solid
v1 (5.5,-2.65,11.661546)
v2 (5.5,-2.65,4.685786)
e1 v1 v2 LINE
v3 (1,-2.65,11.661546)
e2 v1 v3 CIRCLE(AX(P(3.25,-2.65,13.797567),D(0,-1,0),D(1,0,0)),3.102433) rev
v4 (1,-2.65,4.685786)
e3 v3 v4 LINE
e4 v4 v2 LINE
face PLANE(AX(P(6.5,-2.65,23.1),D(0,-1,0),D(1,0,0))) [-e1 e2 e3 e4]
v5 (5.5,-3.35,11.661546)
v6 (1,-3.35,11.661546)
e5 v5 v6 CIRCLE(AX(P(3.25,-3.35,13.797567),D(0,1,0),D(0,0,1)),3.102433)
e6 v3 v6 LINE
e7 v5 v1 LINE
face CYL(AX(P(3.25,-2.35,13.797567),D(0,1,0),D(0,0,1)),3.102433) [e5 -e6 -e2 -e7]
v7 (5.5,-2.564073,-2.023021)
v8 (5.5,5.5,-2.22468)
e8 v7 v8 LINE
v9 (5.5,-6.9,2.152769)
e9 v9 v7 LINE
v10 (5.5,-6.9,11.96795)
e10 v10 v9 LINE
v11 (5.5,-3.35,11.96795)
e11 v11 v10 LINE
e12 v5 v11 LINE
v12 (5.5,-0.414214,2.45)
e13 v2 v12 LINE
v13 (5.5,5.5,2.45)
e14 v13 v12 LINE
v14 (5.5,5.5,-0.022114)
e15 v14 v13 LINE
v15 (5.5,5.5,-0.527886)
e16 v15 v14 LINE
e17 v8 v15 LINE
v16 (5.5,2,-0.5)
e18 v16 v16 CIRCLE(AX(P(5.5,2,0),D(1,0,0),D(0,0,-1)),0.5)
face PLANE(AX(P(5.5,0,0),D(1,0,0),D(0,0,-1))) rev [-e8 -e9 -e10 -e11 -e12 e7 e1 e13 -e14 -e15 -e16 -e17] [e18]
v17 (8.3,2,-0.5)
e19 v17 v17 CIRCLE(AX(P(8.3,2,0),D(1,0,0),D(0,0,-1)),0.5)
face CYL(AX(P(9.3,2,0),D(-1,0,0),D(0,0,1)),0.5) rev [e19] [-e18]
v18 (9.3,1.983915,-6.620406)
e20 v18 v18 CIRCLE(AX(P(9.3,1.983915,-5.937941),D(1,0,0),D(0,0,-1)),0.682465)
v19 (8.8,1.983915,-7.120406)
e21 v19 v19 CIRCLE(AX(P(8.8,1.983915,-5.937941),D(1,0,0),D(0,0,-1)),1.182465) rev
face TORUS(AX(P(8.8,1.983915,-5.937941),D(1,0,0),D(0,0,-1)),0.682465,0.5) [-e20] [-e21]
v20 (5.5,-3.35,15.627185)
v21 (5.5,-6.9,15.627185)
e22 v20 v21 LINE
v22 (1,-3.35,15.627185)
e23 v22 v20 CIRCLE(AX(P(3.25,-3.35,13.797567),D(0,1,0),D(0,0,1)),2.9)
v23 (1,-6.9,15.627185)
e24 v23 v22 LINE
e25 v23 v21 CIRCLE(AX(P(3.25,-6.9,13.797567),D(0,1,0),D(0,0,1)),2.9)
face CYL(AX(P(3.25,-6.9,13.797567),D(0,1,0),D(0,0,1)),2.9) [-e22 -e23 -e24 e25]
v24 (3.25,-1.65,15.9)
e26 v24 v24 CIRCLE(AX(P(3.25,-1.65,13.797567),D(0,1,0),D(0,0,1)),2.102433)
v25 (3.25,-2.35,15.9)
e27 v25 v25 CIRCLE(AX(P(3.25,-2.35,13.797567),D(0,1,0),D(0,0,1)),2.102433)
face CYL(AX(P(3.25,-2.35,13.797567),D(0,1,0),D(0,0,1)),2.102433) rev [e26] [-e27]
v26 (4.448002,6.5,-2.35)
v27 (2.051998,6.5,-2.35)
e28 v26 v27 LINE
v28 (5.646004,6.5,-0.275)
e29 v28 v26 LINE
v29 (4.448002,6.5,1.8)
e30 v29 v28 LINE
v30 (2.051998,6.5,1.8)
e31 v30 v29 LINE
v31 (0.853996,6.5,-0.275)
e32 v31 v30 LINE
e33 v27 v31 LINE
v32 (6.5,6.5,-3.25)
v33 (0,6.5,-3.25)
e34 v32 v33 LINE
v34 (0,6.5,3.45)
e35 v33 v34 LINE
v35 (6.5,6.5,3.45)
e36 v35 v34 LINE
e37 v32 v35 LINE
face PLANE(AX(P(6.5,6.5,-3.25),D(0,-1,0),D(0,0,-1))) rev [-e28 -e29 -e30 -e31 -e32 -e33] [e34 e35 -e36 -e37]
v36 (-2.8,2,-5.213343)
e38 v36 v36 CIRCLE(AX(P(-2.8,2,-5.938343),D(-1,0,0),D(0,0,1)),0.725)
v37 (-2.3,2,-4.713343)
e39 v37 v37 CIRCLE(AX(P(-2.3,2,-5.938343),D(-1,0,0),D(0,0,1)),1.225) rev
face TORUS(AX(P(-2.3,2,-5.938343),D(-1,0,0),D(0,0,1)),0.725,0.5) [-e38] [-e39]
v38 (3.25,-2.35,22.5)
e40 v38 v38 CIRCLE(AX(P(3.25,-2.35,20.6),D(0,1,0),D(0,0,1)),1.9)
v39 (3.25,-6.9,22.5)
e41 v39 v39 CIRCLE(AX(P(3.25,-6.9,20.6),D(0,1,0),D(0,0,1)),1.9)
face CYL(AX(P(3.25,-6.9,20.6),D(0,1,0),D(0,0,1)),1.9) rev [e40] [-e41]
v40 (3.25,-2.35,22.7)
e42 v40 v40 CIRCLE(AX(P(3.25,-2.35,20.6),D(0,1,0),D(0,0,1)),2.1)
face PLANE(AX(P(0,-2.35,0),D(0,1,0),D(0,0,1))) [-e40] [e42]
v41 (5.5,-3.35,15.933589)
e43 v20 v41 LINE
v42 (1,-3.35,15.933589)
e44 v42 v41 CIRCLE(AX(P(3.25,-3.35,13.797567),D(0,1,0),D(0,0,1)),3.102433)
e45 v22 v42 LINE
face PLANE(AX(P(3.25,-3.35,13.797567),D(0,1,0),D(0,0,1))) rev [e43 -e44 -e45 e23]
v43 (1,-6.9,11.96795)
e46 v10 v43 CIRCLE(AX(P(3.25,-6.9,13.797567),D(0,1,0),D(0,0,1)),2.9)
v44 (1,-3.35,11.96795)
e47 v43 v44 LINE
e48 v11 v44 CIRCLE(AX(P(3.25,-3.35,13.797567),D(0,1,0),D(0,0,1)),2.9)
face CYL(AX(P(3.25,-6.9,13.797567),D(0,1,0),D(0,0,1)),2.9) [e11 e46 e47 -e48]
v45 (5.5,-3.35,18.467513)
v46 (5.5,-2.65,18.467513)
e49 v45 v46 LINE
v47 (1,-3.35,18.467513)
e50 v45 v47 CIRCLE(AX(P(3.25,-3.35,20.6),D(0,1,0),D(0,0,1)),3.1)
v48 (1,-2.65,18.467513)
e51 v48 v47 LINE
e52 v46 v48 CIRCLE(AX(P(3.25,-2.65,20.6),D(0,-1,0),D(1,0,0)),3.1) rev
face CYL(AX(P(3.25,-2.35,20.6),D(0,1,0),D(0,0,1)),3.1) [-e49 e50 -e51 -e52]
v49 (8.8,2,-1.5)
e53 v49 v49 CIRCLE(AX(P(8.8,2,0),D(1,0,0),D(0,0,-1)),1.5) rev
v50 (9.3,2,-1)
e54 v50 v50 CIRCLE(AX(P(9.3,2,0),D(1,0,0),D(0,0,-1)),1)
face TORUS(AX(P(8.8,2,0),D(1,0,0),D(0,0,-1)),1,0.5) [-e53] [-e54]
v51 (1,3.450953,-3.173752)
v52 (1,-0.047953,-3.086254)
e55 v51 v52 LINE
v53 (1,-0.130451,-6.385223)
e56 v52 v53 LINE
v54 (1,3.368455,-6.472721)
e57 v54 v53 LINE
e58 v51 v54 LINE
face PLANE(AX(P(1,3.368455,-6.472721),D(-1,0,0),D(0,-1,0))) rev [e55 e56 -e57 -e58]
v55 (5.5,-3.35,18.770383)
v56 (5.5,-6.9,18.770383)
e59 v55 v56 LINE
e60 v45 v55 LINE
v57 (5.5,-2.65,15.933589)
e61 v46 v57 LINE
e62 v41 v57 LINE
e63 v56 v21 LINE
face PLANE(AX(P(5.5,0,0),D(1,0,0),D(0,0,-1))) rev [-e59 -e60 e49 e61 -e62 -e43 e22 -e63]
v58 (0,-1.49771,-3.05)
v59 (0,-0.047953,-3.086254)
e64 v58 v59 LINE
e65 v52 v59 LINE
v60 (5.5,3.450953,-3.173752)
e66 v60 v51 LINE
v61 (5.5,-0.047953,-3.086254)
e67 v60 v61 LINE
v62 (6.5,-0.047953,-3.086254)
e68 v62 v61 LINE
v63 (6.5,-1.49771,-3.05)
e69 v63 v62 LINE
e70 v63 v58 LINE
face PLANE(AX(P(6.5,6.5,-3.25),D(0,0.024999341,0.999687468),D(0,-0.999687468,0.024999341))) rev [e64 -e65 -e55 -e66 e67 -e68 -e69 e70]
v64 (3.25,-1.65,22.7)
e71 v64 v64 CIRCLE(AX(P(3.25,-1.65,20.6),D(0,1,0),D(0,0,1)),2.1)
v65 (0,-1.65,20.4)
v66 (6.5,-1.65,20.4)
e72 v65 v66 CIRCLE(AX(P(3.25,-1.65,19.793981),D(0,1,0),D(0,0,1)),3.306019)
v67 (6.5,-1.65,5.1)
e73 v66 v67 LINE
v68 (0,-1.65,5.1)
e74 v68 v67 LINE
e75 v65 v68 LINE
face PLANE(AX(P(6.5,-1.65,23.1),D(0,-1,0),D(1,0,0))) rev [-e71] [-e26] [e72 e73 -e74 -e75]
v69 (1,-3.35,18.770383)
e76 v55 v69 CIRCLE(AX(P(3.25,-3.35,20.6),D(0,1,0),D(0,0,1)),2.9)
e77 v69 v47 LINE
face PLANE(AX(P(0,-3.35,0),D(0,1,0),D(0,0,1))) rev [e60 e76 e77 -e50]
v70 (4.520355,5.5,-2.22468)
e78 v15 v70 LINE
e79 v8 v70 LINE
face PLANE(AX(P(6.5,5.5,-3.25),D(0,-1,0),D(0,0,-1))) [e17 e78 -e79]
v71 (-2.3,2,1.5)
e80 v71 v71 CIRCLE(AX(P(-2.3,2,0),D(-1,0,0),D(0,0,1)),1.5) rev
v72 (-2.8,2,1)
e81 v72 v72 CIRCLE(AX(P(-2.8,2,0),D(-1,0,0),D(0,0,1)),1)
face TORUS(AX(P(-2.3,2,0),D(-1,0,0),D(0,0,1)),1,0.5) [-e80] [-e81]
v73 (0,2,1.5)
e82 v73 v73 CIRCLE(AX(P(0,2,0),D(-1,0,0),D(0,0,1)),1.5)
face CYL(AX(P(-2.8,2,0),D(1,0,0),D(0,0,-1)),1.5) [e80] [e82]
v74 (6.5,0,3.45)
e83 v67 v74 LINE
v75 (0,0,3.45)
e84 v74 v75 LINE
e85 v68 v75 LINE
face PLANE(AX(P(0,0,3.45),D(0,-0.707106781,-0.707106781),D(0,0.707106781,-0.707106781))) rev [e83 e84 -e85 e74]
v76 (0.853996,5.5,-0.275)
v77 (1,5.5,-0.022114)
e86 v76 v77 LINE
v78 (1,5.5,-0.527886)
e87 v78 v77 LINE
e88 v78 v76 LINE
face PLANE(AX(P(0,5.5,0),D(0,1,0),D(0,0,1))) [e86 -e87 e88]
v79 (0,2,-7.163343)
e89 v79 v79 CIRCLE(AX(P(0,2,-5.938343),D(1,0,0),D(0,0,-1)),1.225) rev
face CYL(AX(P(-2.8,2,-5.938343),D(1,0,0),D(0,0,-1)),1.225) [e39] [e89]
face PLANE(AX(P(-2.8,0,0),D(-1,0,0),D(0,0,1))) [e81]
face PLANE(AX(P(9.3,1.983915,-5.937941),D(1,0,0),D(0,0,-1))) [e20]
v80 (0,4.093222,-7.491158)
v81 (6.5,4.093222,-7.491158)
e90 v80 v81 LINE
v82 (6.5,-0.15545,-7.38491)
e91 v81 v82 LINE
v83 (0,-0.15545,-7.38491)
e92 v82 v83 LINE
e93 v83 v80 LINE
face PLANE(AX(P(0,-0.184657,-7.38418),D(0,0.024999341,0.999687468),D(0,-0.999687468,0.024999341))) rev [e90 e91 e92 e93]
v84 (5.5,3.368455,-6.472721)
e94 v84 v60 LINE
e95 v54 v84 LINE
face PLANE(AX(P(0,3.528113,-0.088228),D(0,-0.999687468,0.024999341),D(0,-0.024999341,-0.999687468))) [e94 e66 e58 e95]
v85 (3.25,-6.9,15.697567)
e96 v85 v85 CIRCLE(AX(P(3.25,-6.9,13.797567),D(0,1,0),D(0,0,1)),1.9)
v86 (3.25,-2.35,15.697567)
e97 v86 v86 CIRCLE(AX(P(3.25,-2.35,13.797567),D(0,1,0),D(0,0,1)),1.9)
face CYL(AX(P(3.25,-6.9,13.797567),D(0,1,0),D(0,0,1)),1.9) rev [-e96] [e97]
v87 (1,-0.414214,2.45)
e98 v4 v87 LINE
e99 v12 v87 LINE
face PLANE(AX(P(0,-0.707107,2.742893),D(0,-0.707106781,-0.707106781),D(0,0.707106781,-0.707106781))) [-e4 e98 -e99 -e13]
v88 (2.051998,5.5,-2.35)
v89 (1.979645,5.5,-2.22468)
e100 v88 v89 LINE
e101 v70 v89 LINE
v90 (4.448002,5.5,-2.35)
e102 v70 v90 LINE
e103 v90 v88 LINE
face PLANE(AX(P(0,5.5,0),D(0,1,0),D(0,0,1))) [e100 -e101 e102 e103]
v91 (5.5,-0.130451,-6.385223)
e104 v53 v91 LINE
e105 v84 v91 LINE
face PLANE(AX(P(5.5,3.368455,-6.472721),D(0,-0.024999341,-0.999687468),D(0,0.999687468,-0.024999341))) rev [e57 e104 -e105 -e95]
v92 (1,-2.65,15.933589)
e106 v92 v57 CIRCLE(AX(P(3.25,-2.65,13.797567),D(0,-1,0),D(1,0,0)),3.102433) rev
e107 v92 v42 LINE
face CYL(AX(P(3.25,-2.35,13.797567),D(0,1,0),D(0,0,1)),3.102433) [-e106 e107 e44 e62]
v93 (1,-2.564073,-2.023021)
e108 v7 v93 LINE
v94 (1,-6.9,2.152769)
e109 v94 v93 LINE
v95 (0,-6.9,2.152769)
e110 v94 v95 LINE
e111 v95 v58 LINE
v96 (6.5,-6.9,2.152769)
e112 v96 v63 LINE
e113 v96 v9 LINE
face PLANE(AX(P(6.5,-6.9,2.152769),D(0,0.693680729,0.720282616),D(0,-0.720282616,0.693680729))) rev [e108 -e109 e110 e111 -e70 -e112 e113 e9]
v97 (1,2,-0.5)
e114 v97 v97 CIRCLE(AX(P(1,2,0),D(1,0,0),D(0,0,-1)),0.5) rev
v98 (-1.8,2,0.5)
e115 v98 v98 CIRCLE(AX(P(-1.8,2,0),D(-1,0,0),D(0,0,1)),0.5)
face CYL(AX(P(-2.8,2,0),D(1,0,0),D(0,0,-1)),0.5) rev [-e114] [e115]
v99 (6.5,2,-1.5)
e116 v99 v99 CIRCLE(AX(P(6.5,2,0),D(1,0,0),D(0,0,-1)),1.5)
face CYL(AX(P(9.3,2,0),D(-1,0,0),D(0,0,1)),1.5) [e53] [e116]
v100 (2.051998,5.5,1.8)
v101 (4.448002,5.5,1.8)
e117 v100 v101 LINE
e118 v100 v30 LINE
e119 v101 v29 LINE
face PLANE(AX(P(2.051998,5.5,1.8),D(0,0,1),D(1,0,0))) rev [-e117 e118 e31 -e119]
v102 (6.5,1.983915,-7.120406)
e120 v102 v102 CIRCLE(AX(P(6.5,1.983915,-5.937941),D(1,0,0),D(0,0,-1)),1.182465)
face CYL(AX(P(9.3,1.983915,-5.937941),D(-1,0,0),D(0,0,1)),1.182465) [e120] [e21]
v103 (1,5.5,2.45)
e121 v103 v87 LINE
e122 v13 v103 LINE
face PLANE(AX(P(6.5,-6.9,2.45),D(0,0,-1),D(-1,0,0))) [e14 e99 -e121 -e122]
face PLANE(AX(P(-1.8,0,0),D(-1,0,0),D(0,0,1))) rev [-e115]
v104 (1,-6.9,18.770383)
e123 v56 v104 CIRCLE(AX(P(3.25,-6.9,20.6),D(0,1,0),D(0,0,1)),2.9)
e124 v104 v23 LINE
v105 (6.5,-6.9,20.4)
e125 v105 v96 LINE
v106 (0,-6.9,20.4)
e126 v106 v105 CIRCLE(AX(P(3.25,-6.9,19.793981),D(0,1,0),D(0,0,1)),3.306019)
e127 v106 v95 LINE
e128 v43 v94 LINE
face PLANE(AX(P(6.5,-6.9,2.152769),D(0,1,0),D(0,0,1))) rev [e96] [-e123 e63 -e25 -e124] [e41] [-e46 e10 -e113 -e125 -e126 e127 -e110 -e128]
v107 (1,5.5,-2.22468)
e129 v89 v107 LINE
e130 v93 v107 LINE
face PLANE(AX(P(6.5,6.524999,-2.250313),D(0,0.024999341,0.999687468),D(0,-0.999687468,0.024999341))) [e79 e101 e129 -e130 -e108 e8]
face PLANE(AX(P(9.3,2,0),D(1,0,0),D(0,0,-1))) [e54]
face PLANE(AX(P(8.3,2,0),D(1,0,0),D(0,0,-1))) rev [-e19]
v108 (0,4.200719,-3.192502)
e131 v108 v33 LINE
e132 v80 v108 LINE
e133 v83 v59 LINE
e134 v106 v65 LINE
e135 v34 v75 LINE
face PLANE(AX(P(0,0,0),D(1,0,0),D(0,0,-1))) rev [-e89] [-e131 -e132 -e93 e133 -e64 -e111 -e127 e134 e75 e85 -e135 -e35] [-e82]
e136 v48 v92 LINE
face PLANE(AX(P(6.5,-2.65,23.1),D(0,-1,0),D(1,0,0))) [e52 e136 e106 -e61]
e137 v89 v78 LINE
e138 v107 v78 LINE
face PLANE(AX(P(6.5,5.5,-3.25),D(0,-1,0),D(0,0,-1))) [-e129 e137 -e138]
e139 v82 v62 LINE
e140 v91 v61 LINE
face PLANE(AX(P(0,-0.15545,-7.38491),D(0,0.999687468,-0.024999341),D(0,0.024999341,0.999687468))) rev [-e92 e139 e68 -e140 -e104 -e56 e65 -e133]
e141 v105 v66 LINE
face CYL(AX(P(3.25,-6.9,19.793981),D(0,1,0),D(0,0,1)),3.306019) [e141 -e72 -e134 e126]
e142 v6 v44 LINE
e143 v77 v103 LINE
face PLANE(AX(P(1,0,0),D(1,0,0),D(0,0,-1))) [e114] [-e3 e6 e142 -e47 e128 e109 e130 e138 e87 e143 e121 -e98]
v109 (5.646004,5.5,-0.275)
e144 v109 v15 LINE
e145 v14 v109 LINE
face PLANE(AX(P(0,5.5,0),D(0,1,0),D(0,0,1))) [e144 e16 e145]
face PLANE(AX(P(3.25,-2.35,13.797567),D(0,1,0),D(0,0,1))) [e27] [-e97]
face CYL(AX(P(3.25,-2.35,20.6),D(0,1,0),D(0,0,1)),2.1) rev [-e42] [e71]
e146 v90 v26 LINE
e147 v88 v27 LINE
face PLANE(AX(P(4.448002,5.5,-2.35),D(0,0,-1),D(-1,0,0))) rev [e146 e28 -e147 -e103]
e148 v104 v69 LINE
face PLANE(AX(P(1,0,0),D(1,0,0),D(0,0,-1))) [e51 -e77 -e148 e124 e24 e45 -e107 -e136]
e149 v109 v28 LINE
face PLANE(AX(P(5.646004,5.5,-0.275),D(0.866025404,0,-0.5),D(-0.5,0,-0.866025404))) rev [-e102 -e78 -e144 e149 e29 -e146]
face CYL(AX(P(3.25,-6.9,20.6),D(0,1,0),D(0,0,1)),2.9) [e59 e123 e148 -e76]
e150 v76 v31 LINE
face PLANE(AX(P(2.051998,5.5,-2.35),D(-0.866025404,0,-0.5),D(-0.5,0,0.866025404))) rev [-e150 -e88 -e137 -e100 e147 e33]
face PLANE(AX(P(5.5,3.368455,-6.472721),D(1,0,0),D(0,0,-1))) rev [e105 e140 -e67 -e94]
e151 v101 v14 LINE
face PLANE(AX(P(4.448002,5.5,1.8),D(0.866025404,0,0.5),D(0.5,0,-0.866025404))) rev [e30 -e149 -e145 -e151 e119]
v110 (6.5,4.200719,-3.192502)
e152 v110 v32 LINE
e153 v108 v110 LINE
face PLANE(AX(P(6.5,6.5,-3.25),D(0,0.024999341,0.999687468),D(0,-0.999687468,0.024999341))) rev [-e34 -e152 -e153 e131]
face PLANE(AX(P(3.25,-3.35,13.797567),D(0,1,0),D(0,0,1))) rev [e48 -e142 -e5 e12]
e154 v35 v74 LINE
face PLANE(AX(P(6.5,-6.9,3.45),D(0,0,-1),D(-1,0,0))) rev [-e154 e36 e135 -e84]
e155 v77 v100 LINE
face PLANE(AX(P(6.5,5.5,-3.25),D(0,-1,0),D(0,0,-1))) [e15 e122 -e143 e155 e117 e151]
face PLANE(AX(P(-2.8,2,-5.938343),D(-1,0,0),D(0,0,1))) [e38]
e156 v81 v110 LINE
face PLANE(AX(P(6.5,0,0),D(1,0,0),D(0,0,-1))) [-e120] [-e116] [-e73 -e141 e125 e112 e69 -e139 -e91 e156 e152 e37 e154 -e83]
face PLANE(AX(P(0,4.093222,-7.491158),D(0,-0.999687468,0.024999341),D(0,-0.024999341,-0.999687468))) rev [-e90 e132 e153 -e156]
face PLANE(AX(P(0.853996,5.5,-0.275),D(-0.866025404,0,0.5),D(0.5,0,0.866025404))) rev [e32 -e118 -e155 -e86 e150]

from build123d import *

# Parameters (mm, degrees)
BOSS_EXTRUDE3_DEPTH  = 6.5
SKETCH5_W            = 6.5
SKETCH5_H            = 5.25
BOSS_EXTRUDE4_DEPTH  = 19.65
SKETCH7_W            = 6.5
SKETCH7_H            = 1.65
BOSS_EXTRUDE5_DEPTH  = 1.65
CUT_EXTRUDE1_DEPTH   = 25.96938125
SKETCH10_R           = 1.5
BOSS_EXTRUDE6_DEPTH  = 2.8
FILLET5_R            = 0.5
BOSS_EXTRUDE7_START  = 2.8
BOSS_EXTRUDE7_DEPTH  = 2.8
CUT_EXTRUDE5_DEPTH   = 27.20157438
CUT_EXTRUDE13_DEPTH  = 0.7
SKETCH23_R           = 1.9
CUT_EXTRUDE14_DEPTH  = 27.427684348
SKETCH20_R           = 2.102432725
CUT_EXTRUDE15_DEPTH  = 0.7
SKETCH24_R           = 1.9
CUT_EXTRUDE16_DEPTH  = 27.427684348
SHELL3_START         = -6.9
SHELL3_DEPTH         = 4.25
SHELL3_2_DEPTH       = 3.55
SHELL3_START_2       = 1
SHELL3_3_DEPTH       = 4.5
SHELL3_START_3       = -1.8
SHELL3_4_OUTLINE_R   = 0.5
SHELL3_4_DEPTH       = 10.1
CUT_EXTRUDE21_DEPTH  = 1
SKETCH27_W           = 6.5
SKETCH27_H           = 4.25
BOSS_EXTRUDE8_DEPTH  = 4.3
SKETCH30_R           = 1.182465124
BOSS_EXTRUDE9_DEPTH  = 2.8
FILLET7_R            = 0.5
SKETCH32_R           = 1.225
BOSS_EXTRUDE11_DEPTH = 2.8
FILLET8_R            = 0.5
SKETCH35_W           = 4.5
SKETCH35_H           = 3.3
CUT_EXTRUDE22_DEPTH  = 3.5


with BuildPart() as part:
    # Sketch4 → Boss-Extrude3 (new body)
    with BuildSketch(Plane(origin=(0, 0, 0), x_dir=(0, 0, -1), z_dir=(1, 0, 0))):
        Polygon((3.25, 6.5), (3.05, -1.497710452), (-2.152769119, -6.9), (-3.45, -6.9), (-3.45, 6.5), align=None)
    extrude(amount=BOSS_EXTRUDE3_DEPTH)

    # Sketch5 → Boss-Extrude4 (add)
    with BuildSketch(Plane.XY.offset(3.45)):
        with Locations((3.25, -4.275)):
            Rectangle(SKETCH5_W, SKETCH5_H)
    extrude(amount=BOSS_EXTRUDE4_DEPTH)

    # Sketch7 → Boss-Extrude5 (add)
    with BuildSketch(Plane.XY.offset(3.45)):
        with Locations((3.25, -0.825)):
            Rectangle(SKETCH7_W, SKETCH7_H)
    extrude(amount=BOSS_EXTRUDE5_DEPTH)

    # Sketch8 → Cut-Extrude1 (cut, through all)
    with BuildSketch(Plane(origin=(6.5, 0, 0), x_dir=(0, 0, -1), z_dir=(1, 0, 0))):
        Polygon((-3.45, 0), (-5.1, -1.65), (-5.1, 0), align=None)
    extrude(amount=-CUT_EXTRUDE1_DEPTH, mode=Mode.SUBTRACT)

    # Sketch10 → Boss-Extrude6 (add)
    with BuildSketch(Plane(origin=(6.5, 0, 0), x_dir=(0, 0, -1), z_dir=(1, 0, 0))):
        with Locations((0, 2)):
            Circle(SKETCH10_R)
    extrude(amount=BOSS_EXTRUDE6_DEPTH)

    # Fillet5
    fillet5_edges = [part.edges().sort_by_distance(p)[0] for p in [
        (9.3, 2, 1.5),
    ]]
    fillet(fillet5_edges, radius=FILLET5_R)

    # Sketch13 → Boss-Extrude7 (add)
    with BuildSketch(Plane.ZY.offset(BOSS_EXTRUDE7_START)):
        with BuildLine():
            ThreePointArc((-1.5, 2), (-1.060660172, 0.939339828), (0, 0.5))
            Line((0, 0.5), (0, 2))
            Line((0, 2), (-1.5, 2))
        make_face()
        with BuildLine():
            Line((0, 2), (0, 0.5))
            ThreePointArc((0, 0.5), (1.060660172, 0.939339828), (1.5, 2))
            Line((1.5, 2), (0, 2))
        make_face()
        with BuildLine():
            Line((-1.5, 2), (0, 2))
            Line((0, 2), (0, 3.5))
            ThreePointArc((0, 3.5), (-1.060660172, 3.060660172), (-1.5, 2))
        make_face()
        with BuildLine():
            Line((0, 3.5), (0, 2))
            Line((0, 2), (1.5, 2))
            ThreePointArc((1.5, 2), (1.060660172, 3.060660172), (0, 3.5))
        make_face()
    extrude(amount=-BOSS_EXTRUDE7_DEPTH)

    # Fillet6: read off the stored shape, not the designer's step
    # Fillet6 outline → Fillet6 (revolve, cut)
    with BuildSketch(Plane(origin=(0, 2, 0), x_dir=(0, 1, 0), z_dir=(0, 0, -1))):
        with BuildLine():
            Line((1.5, -2.8), (1.5, -2.3))
            ThreePointArc((1.5, -2.3), (1.353553391, -2.653553391), (1, -2.8))
            Line((1, -2.8), (1.5, -2.8))
        make_face()
    revolve(axis=Axis((0, 2, 0), (1, 0, 0)), mode=Mode.SUBTRACT)

    # Sketch15 → Cut-Extrude5 (cut, through all)
    with BuildSketch(Plane(origin=(0, -1.65, 0), x_dir=(1, 0, 0), z_dir=(0, 1, 0))):
        with BuildLine():
            Line((0, -23.1), (3.25, -23.1))
            ThreePointArc((3.25, -23.1), (1.137389056, -22.336939099), (0, -20.4))
            Line((0, -20.4), (0, -23.1))
        make_face()
        with BuildLine():
            Line((6.5, -23.1), (6.5, -20.4))
            ThreePointArc((6.5, -20.4), (5.362610944, -22.336939099), (3.25, -23.1))
            Line((3.25, -23.1), (6.5, -23.1))
        make_face()
    extrude(amount=-CUT_EXTRUDE5_DEPTH, mode=Mode.SUBTRACT)

    # Sketch16 → Cut-Extrude13 (cut)
    with BuildSketch(Plane(origin=(0, -1.65, 0), x_dir=(1, 0, 0), z_dir=(0, 1, 0))):
        with BuildLine():
            ThreePointArc((3.25, -18.5), (1.15, -20.6), (3.25, -22.7))
            Line((3.25, -22.7), (3.25, -18.5))
        make_face()
        with BuildLine():
            Line((3.25, -18.5), (3.25, -22.7))
            ThreePointArc((3.25, -22.7), (4.73492424, -22.08492424), (5.35, -20.6))
            ThreePointArc((5.35, -20.6), (4.73492424, -19.11507576), (3.25, -18.5))
        make_face()
    extrude(amount=-CUT_EXTRUDE13_DEPTH, mode=Mode.SUBTRACT)

    # Sketch23 → Cut-Extrude14 (cut, through all)
    with BuildSketch(Plane(origin=(0, -2.35, 0), x_dir=(1, 0, 0), z_dir=(0, 1, 0))):
        with Locations(Location((3.25, -20.6, 0), (0, 0, 270))):
            Circle(SKETCH23_R)
    extrude(amount=-CUT_EXTRUDE14_DEPTH, mode=Mode.SUBTRACT)

    # Sketch20 → Cut-Extrude15 (cut)
    with BuildSketch(Plane(origin=(0, -1.65, 0), x_dir=(1, 0, 0), z_dir=(0, 1, 0))):
        with Locations(Location((3.25, -13.797567275, 0), (0, 0, 270))):
            Circle(SKETCH20_R)
    extrude(amount=-CUT_EXTRUDE15_DEPTH, mode=Mode.SUBTRACT)

    # Sketch24 → Cut-Extrude16 (cut, through all)
    with BuildSketch(Plane(origin=(0, -2.35, 0), x_dir=(1, 0, 0), z_dir=(0, 1, 0))):
        with Locations(Location((3.25, -13.797567275, 0), (0, 0, 270))):
            Circle(SKETCH24_R)
    extrude(amount=-CUT_EXTRUDE16_DEPTH, mode=Mode.SUBTRACT)

    # Shell3: read off the stored shape, not the designer's step
    # Shell3 outline → Shell3 (cut)
    with BuildSketch(Plane(origin=(0, 0, 0), x_dir=(1, 0, 0), z_dir=(0, 1, 0)).offset(SHELL3_START)):
        with BuildLine():
            ThreePointArc((1, -11.661545549), (3.25, -10.69513455), (5.5, -11.661545549))
            Line((5.5, -11.661545549), (5.5, -2.45))
            Line((5.5, -2.45), (1, -2.45))
            Line((1, -2.45), (1, -11.661545549))
        make_face()
        with BuildLine():
            ThreePointArc((5.5, -15.933589001), (3.25, -16.9), (1, -15.933589001))
            Line((1, -15.933589001), (1, -18.467513189))
            ThreePointArc((1, -18.467513189), (3.25, -17.5), (5.5, -18.467513189))
            Line((5.5, -18.467513189), (5.5, -15.933589001))
        make_face()
    extrude(amount=SHELL3_DEPTH, mode=Mode.SUBTRACT)

    # Shell3 2 outline → Shell3 2 (cut)
    with BuildSketch(Plane(origin=(0, 0, 0), x_dir=(1, 0, 0), z_dir=(0, 1, 0)).offset(SHELL3_START)):
        with BuildLine():
            ThreePointArc((1, -11.967949829), (3.25, -10.897567275), (5.5, -11.967949829))
            Line((5.5, -11.967949829), (5.5, -11.661545549))
            ThreePointArc((5.5, -11.661545549), (3.25, -10.69513455), (1, -11.661545549))
            Line((1, -11.661545549), (1, -11.967949829))
        make_face()
        with BuildLine():
            ThreePointArc((5.5, -15.627184721), (3.25, -16.697567275), (1, -15.627184721))
            Line((1, -15.627184721), (1, -15.933589001))
            ThreePointArc((1, -15.933589001), (3.25, -16.9), (5.5, -15.933589001))
            Line((5.5, -15.933589001), (5.5, -15.627184721))
        make_face()
        with BuildLine():
            ThreePointArc((5.5, -18.467513189), (3.25, -17.5), (1, -18.467513189))
            Line((1, -18.467513189), (1, -18.770382554))
            ThreePointArc((1, -18.770382554), (3.25, -17.7), (5.5, -18.770382554))
            Line((5.5, -18.770382554), (5.5, -18.467513189))
        make_face()
    extrude(amount=SHELL3_2_DEPTH, mode=Mode.SUBTRACT)

    # Shell3 3 outline → Shell3 3 (cut)
    with BuildSketch(Plane.YZ.offset(SHELL3_START_2)):
        Polygon((-0.414213562, 2.45), (-2.65, 4.685786438), (-2.65, 2.45), (-6.9, 2.45), (-6.9, 2.152769119), (-2.564073304, -2.023020667), (5.5, -2.224680213), (5.5, 2.45), align=None)
    extrude(amount=SHELL3_3_DEPTH, mode=Mode.SUBTRACT)

    # Shell3 4 outline → Shell3 4 (cut)
    with BuildSketch(Plane.YZ.offset(SHELL3_START_3)):
        with Locations((2, 0)):
            Circle(SHELL3_4_OUTLINE_R)
    extrude(amount=SHELL3_4_DEPTH, mode=Mode.SUBTRACT)

    # Sketch25 → Cut-Extrude21 (cut)
    with BuildSketch(Plane(origin=(0, 6.5, 0), x_dir=(1, 0, 0), z_dir=(0, 1, 0))):
        Polygon((0.853996383, 0.275), (2.051998191, -1.8), (4.448001809, -1.8), (5.646003617, 0.275), (4.448001809, 2.35), (2.051998191, 2.35), align=None)
    extrude(amount=-CUT_EXTRUDE21_DEPTH, mode=Mode.SUBTRACT)

    # Sketch27 → Boss-Extrude8 (add)
    with BuildSketch(Plane(origin=(0, -0.077160181, -3.085523923), x_dir=(-1, 0, 0), z_dir=(0, -0.02499934134114434, -0.9996874676280127))):
        with Locations((-3.25, 2.154216399)):
            Rectangle(SKETCH27_W, SKETCH27_H)
    extrude(amount=BOSS_EXTRUDE8_DEPTH)

    # Sketch30 → Boss-Extrude9 (add)
    with BuildSketch(Plane(origin=(6.5, 0, 0), x_dir=(0, 0, -1), z_dir=(1, 0, 0))):
        with Locations((5.937940908, 1.983914598)):
            Circle(SKETCH30_R)
    extrude(amount=BOSS_EXTRUDE9_DEPTH)

    # Fillet7
    fillet7_edges = [part.edges().sort_by_distance(p)[0] for p in [
        (9.3, 1.983914598, -4.755475784),
    ]]
    fillet(fillet7_edges, radius=FILLET7_R)

    # Sketch32 → Boss-Extrude11 (add)
    with BuildSketch(Plane.ZY):
        with Locations(Location((-5.938343158, 2, 0), (0, 0, 180))):
            Circle(SKETCH32_R)
    extrude(amount=BOSS_EXTRUDE11_DEPTH)

    # Fillet8
    fillet8_edges = [part.edges().sort_by_distance(p)[0] for p in [
        (-2.8, 2, -4.713343158),
    ]]
    fillet(fillet8_edges, radius=FILLET8_R)

    # Sketch35 → Cut-Extrude22 (cut)
    with BuildSketch(Plane(origin=(0, 0.029207268, -0.000730391), x_dir=(1, 0, 0), z_dir=(0, -0.9996874676280127, 0.024999341341144354))):
        with Locations((3.25, -4.736488551)):
            Rectangle(SKETCH35_W, SKETCH35_H)
    extrude(amount=-CUT_EXTRUDE22_DEPTH, mode=Mode.SUBTRACT)


solid = part.part
